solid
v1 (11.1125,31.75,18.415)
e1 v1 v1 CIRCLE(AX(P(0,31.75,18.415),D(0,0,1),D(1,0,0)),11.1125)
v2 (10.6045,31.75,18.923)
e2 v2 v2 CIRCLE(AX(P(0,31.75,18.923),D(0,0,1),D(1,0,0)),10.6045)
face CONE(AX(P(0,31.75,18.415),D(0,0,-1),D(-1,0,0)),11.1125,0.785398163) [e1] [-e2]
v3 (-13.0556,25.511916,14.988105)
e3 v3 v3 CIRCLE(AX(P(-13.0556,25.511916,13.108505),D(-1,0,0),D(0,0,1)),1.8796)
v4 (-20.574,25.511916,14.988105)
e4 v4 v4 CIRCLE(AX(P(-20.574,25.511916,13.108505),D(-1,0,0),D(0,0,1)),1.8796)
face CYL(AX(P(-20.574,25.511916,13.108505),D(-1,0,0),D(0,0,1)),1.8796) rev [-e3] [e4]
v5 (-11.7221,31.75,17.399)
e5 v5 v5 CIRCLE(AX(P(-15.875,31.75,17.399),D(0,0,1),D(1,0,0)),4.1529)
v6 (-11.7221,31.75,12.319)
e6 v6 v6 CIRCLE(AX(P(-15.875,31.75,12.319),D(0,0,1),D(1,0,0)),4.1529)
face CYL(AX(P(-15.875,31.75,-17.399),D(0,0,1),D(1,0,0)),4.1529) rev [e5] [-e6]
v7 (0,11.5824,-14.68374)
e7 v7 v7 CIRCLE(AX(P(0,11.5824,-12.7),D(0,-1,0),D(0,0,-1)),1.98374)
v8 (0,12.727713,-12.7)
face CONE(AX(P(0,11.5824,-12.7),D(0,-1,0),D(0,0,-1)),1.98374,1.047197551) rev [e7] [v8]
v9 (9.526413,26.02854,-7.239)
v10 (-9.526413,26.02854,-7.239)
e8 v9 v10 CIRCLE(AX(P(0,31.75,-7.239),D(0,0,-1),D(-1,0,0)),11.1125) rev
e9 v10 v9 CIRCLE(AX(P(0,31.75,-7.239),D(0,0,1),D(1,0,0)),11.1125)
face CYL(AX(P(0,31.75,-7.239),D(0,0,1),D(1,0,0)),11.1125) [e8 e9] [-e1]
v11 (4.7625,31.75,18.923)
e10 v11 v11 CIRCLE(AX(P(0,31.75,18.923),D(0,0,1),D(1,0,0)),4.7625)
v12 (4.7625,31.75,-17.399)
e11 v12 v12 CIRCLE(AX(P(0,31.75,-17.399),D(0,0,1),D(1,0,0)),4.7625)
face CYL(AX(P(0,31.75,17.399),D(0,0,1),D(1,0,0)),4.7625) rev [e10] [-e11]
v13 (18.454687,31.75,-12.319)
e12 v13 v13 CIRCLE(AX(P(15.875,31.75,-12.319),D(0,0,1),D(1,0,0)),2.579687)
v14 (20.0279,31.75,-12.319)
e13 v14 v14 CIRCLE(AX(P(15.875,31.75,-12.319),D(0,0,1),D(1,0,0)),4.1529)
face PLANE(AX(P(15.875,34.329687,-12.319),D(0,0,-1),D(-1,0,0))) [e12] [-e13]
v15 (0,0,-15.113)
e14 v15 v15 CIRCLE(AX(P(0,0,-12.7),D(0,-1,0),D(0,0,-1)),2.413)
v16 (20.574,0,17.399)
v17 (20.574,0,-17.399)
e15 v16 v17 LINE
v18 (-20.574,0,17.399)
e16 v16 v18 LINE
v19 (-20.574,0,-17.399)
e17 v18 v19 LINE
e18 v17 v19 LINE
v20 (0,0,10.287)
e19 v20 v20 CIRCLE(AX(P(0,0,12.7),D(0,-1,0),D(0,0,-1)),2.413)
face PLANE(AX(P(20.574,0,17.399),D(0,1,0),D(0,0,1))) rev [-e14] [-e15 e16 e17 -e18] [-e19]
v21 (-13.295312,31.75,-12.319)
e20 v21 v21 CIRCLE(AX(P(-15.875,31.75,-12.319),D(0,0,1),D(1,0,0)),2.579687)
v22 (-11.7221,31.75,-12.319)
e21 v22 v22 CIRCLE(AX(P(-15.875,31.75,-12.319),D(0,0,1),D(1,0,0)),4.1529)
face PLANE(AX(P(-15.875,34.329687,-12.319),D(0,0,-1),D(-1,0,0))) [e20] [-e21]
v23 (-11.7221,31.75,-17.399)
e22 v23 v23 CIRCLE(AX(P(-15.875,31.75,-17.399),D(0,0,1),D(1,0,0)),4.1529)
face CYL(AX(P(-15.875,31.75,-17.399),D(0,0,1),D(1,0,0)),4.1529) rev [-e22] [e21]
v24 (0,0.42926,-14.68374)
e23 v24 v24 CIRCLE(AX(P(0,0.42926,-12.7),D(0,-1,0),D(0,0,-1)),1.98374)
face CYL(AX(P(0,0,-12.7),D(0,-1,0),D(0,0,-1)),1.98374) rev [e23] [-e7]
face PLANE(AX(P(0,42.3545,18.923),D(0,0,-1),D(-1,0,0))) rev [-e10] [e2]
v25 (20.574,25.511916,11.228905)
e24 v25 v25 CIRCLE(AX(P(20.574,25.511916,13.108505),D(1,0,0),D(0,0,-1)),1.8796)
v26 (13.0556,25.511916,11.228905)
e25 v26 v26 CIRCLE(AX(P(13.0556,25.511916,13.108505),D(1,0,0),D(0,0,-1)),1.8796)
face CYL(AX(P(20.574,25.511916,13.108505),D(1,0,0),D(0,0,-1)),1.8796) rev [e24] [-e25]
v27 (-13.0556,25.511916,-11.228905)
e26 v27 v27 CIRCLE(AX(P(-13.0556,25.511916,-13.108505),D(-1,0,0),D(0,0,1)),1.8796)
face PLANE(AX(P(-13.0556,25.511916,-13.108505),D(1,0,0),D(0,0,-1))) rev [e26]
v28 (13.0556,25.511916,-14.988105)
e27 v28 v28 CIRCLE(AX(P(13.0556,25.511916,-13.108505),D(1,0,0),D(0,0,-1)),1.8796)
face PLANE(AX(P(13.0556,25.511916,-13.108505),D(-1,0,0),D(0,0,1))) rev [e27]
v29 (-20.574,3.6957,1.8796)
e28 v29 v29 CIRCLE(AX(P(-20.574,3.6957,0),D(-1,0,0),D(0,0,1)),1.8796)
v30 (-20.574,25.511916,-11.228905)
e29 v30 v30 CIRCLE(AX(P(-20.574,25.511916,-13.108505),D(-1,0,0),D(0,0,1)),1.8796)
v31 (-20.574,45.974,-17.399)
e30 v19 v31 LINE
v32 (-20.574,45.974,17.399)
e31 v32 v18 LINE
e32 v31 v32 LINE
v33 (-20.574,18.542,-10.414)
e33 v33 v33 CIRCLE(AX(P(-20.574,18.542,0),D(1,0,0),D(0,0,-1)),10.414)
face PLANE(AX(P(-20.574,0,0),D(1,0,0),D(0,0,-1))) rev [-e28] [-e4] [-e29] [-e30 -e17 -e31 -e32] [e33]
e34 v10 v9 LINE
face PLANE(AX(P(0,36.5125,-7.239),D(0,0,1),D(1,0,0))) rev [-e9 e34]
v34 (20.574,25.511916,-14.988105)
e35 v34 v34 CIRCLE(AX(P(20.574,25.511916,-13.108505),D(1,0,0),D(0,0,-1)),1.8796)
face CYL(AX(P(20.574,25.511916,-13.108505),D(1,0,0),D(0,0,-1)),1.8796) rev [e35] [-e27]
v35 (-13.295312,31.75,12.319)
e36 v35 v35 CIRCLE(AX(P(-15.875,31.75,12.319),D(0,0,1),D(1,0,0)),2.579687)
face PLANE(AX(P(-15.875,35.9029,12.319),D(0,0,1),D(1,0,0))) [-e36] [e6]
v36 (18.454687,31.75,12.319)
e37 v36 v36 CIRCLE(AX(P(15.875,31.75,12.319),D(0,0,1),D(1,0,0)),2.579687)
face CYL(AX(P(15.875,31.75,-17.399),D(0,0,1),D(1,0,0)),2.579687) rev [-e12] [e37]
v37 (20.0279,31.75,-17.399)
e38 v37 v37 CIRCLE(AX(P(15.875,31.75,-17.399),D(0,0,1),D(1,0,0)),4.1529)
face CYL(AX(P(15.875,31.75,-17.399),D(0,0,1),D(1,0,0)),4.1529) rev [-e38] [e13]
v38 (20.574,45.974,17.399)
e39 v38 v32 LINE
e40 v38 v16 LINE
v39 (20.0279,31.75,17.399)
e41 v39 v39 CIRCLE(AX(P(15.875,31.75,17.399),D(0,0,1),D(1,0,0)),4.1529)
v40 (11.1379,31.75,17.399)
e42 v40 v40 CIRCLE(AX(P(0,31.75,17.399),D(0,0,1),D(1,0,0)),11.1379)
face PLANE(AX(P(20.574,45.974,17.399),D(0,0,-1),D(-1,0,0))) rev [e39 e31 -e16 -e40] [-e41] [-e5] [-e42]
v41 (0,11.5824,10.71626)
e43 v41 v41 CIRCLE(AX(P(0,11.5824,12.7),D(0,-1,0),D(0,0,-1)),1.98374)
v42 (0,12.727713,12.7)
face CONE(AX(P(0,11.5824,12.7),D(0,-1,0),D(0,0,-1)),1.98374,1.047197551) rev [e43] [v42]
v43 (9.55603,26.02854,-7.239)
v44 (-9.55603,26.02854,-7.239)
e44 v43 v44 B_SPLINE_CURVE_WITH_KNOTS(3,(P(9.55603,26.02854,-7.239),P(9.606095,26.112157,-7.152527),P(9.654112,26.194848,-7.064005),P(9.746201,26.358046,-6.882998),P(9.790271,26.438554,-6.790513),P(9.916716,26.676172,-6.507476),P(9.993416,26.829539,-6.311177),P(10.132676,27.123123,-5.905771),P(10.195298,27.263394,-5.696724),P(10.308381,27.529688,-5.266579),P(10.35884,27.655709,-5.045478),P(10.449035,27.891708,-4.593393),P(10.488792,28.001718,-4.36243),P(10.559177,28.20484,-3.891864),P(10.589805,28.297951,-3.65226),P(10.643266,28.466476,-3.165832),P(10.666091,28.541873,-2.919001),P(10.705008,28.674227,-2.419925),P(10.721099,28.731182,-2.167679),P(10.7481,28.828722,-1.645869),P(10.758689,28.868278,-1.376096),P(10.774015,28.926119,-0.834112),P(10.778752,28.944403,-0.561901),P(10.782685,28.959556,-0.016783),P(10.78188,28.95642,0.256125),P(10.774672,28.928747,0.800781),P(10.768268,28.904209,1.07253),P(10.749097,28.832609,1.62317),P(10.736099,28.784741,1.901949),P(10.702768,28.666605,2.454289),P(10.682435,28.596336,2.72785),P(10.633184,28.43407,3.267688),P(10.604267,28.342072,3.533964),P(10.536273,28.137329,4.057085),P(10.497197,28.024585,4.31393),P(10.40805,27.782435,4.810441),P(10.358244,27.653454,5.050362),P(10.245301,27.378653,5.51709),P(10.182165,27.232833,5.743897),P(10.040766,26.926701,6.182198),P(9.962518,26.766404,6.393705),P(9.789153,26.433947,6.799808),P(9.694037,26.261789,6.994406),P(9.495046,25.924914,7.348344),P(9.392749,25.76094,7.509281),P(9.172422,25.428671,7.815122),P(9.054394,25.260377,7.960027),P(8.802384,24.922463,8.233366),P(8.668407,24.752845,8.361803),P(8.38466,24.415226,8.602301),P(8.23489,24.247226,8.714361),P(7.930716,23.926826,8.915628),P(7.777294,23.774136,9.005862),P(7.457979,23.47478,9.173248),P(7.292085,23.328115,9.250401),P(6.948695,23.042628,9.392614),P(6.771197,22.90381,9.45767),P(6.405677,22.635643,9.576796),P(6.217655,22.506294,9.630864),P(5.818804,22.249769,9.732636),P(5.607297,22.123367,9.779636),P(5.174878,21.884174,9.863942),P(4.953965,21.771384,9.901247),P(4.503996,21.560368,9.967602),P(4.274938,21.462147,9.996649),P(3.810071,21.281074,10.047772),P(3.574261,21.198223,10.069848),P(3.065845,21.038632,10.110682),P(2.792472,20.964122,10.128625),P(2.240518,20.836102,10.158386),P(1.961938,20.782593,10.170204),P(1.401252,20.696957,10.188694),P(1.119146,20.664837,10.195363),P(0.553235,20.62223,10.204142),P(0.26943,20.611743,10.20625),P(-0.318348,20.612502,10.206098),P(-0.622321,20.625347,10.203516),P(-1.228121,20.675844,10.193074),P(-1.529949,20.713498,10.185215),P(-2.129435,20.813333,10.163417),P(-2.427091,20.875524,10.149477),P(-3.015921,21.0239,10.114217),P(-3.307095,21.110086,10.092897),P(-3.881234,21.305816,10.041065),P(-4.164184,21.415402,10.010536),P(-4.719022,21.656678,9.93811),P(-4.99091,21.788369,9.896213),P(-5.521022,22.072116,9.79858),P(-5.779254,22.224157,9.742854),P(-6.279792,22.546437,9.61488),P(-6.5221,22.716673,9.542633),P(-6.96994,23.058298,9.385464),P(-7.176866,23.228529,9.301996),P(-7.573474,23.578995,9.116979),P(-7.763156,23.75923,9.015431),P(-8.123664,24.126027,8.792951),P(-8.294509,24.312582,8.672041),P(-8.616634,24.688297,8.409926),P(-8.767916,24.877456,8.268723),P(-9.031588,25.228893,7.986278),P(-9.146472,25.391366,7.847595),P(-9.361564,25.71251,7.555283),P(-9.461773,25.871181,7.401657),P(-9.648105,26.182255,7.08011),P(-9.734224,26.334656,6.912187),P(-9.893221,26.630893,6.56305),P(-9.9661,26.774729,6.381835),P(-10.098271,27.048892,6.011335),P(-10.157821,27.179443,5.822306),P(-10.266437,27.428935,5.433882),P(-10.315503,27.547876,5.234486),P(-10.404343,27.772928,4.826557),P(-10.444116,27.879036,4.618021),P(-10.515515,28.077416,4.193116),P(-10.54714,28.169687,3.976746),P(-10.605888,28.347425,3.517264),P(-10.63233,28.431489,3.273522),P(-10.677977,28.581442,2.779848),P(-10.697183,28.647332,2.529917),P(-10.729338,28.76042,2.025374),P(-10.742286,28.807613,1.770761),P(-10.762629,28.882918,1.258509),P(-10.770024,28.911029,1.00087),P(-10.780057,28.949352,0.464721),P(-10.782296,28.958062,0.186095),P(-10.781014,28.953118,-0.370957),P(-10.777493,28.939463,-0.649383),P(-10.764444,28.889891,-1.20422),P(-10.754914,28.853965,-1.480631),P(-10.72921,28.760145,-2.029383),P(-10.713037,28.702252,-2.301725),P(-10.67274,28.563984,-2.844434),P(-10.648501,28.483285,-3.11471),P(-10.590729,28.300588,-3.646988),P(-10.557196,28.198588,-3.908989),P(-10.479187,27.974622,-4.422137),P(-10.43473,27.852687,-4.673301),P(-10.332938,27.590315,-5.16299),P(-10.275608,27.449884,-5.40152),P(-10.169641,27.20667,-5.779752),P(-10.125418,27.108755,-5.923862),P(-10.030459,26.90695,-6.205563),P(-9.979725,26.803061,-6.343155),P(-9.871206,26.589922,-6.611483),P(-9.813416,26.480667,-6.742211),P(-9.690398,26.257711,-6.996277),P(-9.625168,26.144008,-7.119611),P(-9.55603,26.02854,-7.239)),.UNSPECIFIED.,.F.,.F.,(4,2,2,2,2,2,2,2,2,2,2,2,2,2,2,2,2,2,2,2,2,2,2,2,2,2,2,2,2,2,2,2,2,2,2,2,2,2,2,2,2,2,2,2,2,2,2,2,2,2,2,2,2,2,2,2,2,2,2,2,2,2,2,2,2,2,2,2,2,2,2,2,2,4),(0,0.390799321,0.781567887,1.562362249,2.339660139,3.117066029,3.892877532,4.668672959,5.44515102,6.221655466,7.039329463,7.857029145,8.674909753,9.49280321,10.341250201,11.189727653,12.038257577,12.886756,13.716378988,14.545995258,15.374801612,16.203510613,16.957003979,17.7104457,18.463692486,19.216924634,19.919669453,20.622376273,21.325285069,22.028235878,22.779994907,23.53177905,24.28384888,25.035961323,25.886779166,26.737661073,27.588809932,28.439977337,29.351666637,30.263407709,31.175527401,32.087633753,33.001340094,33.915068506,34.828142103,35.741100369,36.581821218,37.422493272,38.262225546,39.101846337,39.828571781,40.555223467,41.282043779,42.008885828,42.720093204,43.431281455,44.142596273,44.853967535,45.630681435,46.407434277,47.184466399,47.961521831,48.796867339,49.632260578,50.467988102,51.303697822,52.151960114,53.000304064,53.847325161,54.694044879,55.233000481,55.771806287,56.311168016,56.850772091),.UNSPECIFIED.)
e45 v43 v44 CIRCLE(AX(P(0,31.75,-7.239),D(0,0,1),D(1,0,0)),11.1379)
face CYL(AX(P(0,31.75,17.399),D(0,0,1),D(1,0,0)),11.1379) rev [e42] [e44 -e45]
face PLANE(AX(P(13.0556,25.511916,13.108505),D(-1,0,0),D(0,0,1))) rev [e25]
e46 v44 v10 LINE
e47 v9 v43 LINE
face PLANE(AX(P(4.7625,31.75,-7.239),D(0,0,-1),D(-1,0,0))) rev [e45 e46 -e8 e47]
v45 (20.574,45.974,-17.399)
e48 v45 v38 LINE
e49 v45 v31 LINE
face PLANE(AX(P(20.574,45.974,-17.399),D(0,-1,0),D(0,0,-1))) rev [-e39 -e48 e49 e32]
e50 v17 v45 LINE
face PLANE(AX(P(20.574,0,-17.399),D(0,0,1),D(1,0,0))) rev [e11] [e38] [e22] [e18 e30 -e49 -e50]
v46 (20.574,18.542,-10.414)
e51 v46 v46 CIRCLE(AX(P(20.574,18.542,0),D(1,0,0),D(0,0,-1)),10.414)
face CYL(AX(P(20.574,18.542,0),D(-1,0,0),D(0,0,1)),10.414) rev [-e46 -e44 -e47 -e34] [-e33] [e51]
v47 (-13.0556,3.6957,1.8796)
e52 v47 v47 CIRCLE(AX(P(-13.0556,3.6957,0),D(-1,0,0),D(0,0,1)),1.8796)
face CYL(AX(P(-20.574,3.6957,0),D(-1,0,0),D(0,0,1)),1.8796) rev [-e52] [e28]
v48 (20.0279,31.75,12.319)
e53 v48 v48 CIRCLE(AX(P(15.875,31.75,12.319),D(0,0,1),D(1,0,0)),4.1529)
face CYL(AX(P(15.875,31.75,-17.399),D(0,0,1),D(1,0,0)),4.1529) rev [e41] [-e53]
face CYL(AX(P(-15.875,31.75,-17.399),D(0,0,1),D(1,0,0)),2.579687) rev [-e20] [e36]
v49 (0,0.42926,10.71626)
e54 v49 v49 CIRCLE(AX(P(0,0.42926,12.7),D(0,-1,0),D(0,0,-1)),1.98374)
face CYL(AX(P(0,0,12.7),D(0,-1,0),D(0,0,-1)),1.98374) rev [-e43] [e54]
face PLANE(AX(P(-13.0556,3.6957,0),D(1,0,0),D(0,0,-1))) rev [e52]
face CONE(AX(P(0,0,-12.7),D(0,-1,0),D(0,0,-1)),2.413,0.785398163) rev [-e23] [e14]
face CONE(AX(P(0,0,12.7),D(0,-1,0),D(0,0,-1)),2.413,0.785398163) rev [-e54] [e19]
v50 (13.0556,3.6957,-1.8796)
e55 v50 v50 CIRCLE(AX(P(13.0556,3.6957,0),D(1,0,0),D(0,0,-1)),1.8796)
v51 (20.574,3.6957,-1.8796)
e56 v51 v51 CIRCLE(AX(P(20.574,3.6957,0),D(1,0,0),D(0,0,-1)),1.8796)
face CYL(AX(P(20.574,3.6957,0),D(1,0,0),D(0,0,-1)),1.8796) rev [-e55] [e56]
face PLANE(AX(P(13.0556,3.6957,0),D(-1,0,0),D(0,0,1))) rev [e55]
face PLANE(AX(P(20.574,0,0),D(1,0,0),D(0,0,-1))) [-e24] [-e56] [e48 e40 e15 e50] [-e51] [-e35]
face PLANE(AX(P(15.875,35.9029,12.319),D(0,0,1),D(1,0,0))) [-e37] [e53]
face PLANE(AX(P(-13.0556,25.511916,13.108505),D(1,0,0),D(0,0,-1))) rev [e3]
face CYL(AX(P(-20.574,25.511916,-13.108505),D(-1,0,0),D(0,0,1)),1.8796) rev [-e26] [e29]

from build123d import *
from build123d.topology import SkipClean

# Parameters (mm, degrees)
BOSS_EXTRUDE1_DEPTH      = 20.574
BOSS_EXTRUDE1_DEPTH_BACK = 20.574
SKETCH1_W                = 34.798
SKETCH1_H                = 45.974
SKETCH1_R                = 10.414
HOLE1_D                  = 3.96748
HOLE1_DEPTH              = 11.5824
HOLE1_CSINK_D            = 4.826
HOLE1_CSINK_ANGLE        = 90
HOLE1_TIP                = 1.145312823
HOLE2_D                  = 3.96748
HOLE2_DEPTH              = 11.5824
HOLE2_CSINK_D            = 4.826
HOLE2_CSINK_ANGLE        = 90
HOLE2_TIP                = 1.145312823
HOLE3_D                  = 9.525
HOLE3_CBORE_D            = 22.2758
HOLE3_CBORE_DEPTH        = 24.638
HOLE4_D                  = 3.7592
HOLE4_DEPTH              = 7.5184
LPATTERN2_COUNT          = 2
LPATTERN2_PITCH          = 26.217009696
LPATTERN2_COUNT_DIR2     = 2
LPATTERN2_PITCH_DIR2     = 25.451525793
HOLE5_D                  = 3.7592
HOLE5_DEPTH              = 7.5184
LPATTERN4_COUNT          = 2
LPATTERN4_PITCH          = 26.217009696
LPATTERN4_COUNT_DIR2     = 2
LPATTERN4_PITCH_DIR2     = 25.451525793


with BuildPart() as part:
    # Sketch1 → Boss-Extrude1 (new, two sides: drawn at the far end of the back side and taken through both)
    with BuildSketch(Plane(origin=(0, 0, 0), x_dir=(0, 0, -1), z_dir=(1, 0, 0)).offset(-BOSS_EXTRUDE1_DEPTH_BACK)):
        with Locations((0, 22.987)):
            Rectangle(SKETCH1_W, SKETCH1_H)
        with Locations((0, 18.542)):
            Circle(SKETCH1_R, mode=Mode.SUBTRACT)
    extrude(amount=BOSS_EXTRUDE1_DEPTH + BOSS_EXTRUDE1_DEPTH_BACK)

    # Sketch2 → Cut-Revolve1 (revolve, cut)
    with BuildSketch(Plane(origin=(15.875, 0, 0), x_dir=(0, 0, -1), z_dir=(1, 0, 0))):
        Polygon((-17.399, 31.75), (-17.399, 35.9029), (-12.319, 35.9029), (-12.319, 34.3296875), (12.319, 34.3296875), (12.319, 35.9029), (17.399, 35.9029), (17.399, 31.75), align=None)
    revolve(axis=Axis((15.875, 31.75, -17.399), (0, 0, 1)), mode=Mode.SUBTRACT)

    # Sketch3 → Cut-Revolve2 (revolve, cut)
    with BuildSketch(Plane(origin=(-15.875, 0, 0), x_dir=(0, 0, -1), z_dir=(1, 0, 0))):
        Polygon((-17.399, 31.75), (-17.399, 35.9029), (-12.319, 35.9029), (-12.319, 34.3296875), (12.319, 34.3296875), (12.319, 35.9029), (17.399, 35.9029), (17.399, 31.75), align=None)
    revolve(axis=Axis((-15.875, 31.75, -17.399), (0, 0, 1)), mode=Mode.SUBTRACT)

    # Hole1
    with Locations(Plane(origin=(0, 0, 0), x_dir=(-1, 0, 0), z_dir=(0, -1, 0))):
        with Locations((0, -12.7)):
            CounterSinkHole(HOLE1_D / 2, HOLE1_CSINK_D / 2, depth=HOLE1_DEPTH, counter_sink_angle=HOLE1_CSINK_ANGLE)
            with Locations((0, 0, -(HOLE1_DEPTH + HOLE1_TIP / 2))):  # 120° drill point
                Cone(0, HOLE1_D / 2, HOLE1_TIP, mode=Mode.SUBTRACT)

    # Hole2
    with Locations(Plane(origin=(0, 0, 0), x_dir=(-1, 0, 0), z_dir=(0, -1, 0))):
        with Locations((0, 12.7)):
            CounterSinkHole(HOLE2_D / 2, HOLE2_CSINK_D / 2, depth=HOLE2_DEPTH, counter_sink_angle=HOLE2_CSINK_ANGLE)
            with Locations((0, 0, -(HOLE2_DEPTH + HOLE2_TIP / 2))):  # 120° drill point
                Cone(0, HOLE2_D / 2, HOLE2_TIP, mode=Mode.SUBTRACT)

    # Hole3 (through all)
    with Locations(Plane.XY.offset(17.399)):
        with Locations((0, 31.75)):
            CounterBoreHole(HOLE3_D / 2, HOLE3_CBORE_D / 2, HOLE3_CBORE_DEPTH)

    # Sketch10 → Revolve1 (revolve)
    with SkipClean():  # the faces are left unmerged after this step: merging them gives an invalid solid
        with BuildSketch(Plane(origin=(0, 0, 0), x_dir=(0, 0, -1), z_dir=(1, 0, 0))):
            Polygon((-18.923, 42.3545), (-18.923, 36.5125), (7.239, 36.5125), (7.239, 42.8625), (-18.415, 42.8625), align=None)
        revolve(axis=Axis((0, 31.75, -7.239), (0, 0, 1)))
    add(part.part.scale(1), mode=Mode.REPLACE)  # the faces are merged on a copy

    # Hole4
    with Locations(Plane(origin=(20.574, 0, 0), x_dir=(0, 0, -1), z_dir=(1, 0, 0))):
        with Locations((13.108504848, 25.511915663)):
            hole4 = Hole(HOLE4_D / 2, depth=HOLE4_DEPTH)

    # LPattern2: Hole4 2 × 2, 1 skipped
    with Locations(*[Vector(0, 0, 1) * (i * LPATTERN2_PITCH) + Vector(0, -0.8571673007021121, 0.5150380749100545) * (j * LPATTERN2_PITCH_DIR2) for i in range(LPATTERN2_COUNT) for j in range(LPATTERN2_COUNT_DIR2) if (i, j) not in ((0, 0), (1, 1))]):
        add(hole4, mode=Mode.SUBTRACT)

    # Hole5
    with Locations(Plane.ZY.offset(20.574)):
        with Locations((-13.108504848, 25.511915663)):
            hole5 = Hole(HOLE5_D / 2, depth=HOLE5_DEPTH)

    # LPattern4: Hole5 2 × 2, 1 skipped
    with Locations(*[Vector(0, 0, 1) * (i * LPATTERN4_PITCH) + Vector(0, -0.8571673007021121, 0.5150380749100545) * (j * LPATTERN4_PITCH_DIR2) for i in range(LPATTERN4_COUNT) for j in range(LPATTERN4_COUNT_DIR2) if (i, j) not in ((0, 0), (1, 1))]):
        add(hole5, mode=Mode.SUBTRACT)


solid = part.part
